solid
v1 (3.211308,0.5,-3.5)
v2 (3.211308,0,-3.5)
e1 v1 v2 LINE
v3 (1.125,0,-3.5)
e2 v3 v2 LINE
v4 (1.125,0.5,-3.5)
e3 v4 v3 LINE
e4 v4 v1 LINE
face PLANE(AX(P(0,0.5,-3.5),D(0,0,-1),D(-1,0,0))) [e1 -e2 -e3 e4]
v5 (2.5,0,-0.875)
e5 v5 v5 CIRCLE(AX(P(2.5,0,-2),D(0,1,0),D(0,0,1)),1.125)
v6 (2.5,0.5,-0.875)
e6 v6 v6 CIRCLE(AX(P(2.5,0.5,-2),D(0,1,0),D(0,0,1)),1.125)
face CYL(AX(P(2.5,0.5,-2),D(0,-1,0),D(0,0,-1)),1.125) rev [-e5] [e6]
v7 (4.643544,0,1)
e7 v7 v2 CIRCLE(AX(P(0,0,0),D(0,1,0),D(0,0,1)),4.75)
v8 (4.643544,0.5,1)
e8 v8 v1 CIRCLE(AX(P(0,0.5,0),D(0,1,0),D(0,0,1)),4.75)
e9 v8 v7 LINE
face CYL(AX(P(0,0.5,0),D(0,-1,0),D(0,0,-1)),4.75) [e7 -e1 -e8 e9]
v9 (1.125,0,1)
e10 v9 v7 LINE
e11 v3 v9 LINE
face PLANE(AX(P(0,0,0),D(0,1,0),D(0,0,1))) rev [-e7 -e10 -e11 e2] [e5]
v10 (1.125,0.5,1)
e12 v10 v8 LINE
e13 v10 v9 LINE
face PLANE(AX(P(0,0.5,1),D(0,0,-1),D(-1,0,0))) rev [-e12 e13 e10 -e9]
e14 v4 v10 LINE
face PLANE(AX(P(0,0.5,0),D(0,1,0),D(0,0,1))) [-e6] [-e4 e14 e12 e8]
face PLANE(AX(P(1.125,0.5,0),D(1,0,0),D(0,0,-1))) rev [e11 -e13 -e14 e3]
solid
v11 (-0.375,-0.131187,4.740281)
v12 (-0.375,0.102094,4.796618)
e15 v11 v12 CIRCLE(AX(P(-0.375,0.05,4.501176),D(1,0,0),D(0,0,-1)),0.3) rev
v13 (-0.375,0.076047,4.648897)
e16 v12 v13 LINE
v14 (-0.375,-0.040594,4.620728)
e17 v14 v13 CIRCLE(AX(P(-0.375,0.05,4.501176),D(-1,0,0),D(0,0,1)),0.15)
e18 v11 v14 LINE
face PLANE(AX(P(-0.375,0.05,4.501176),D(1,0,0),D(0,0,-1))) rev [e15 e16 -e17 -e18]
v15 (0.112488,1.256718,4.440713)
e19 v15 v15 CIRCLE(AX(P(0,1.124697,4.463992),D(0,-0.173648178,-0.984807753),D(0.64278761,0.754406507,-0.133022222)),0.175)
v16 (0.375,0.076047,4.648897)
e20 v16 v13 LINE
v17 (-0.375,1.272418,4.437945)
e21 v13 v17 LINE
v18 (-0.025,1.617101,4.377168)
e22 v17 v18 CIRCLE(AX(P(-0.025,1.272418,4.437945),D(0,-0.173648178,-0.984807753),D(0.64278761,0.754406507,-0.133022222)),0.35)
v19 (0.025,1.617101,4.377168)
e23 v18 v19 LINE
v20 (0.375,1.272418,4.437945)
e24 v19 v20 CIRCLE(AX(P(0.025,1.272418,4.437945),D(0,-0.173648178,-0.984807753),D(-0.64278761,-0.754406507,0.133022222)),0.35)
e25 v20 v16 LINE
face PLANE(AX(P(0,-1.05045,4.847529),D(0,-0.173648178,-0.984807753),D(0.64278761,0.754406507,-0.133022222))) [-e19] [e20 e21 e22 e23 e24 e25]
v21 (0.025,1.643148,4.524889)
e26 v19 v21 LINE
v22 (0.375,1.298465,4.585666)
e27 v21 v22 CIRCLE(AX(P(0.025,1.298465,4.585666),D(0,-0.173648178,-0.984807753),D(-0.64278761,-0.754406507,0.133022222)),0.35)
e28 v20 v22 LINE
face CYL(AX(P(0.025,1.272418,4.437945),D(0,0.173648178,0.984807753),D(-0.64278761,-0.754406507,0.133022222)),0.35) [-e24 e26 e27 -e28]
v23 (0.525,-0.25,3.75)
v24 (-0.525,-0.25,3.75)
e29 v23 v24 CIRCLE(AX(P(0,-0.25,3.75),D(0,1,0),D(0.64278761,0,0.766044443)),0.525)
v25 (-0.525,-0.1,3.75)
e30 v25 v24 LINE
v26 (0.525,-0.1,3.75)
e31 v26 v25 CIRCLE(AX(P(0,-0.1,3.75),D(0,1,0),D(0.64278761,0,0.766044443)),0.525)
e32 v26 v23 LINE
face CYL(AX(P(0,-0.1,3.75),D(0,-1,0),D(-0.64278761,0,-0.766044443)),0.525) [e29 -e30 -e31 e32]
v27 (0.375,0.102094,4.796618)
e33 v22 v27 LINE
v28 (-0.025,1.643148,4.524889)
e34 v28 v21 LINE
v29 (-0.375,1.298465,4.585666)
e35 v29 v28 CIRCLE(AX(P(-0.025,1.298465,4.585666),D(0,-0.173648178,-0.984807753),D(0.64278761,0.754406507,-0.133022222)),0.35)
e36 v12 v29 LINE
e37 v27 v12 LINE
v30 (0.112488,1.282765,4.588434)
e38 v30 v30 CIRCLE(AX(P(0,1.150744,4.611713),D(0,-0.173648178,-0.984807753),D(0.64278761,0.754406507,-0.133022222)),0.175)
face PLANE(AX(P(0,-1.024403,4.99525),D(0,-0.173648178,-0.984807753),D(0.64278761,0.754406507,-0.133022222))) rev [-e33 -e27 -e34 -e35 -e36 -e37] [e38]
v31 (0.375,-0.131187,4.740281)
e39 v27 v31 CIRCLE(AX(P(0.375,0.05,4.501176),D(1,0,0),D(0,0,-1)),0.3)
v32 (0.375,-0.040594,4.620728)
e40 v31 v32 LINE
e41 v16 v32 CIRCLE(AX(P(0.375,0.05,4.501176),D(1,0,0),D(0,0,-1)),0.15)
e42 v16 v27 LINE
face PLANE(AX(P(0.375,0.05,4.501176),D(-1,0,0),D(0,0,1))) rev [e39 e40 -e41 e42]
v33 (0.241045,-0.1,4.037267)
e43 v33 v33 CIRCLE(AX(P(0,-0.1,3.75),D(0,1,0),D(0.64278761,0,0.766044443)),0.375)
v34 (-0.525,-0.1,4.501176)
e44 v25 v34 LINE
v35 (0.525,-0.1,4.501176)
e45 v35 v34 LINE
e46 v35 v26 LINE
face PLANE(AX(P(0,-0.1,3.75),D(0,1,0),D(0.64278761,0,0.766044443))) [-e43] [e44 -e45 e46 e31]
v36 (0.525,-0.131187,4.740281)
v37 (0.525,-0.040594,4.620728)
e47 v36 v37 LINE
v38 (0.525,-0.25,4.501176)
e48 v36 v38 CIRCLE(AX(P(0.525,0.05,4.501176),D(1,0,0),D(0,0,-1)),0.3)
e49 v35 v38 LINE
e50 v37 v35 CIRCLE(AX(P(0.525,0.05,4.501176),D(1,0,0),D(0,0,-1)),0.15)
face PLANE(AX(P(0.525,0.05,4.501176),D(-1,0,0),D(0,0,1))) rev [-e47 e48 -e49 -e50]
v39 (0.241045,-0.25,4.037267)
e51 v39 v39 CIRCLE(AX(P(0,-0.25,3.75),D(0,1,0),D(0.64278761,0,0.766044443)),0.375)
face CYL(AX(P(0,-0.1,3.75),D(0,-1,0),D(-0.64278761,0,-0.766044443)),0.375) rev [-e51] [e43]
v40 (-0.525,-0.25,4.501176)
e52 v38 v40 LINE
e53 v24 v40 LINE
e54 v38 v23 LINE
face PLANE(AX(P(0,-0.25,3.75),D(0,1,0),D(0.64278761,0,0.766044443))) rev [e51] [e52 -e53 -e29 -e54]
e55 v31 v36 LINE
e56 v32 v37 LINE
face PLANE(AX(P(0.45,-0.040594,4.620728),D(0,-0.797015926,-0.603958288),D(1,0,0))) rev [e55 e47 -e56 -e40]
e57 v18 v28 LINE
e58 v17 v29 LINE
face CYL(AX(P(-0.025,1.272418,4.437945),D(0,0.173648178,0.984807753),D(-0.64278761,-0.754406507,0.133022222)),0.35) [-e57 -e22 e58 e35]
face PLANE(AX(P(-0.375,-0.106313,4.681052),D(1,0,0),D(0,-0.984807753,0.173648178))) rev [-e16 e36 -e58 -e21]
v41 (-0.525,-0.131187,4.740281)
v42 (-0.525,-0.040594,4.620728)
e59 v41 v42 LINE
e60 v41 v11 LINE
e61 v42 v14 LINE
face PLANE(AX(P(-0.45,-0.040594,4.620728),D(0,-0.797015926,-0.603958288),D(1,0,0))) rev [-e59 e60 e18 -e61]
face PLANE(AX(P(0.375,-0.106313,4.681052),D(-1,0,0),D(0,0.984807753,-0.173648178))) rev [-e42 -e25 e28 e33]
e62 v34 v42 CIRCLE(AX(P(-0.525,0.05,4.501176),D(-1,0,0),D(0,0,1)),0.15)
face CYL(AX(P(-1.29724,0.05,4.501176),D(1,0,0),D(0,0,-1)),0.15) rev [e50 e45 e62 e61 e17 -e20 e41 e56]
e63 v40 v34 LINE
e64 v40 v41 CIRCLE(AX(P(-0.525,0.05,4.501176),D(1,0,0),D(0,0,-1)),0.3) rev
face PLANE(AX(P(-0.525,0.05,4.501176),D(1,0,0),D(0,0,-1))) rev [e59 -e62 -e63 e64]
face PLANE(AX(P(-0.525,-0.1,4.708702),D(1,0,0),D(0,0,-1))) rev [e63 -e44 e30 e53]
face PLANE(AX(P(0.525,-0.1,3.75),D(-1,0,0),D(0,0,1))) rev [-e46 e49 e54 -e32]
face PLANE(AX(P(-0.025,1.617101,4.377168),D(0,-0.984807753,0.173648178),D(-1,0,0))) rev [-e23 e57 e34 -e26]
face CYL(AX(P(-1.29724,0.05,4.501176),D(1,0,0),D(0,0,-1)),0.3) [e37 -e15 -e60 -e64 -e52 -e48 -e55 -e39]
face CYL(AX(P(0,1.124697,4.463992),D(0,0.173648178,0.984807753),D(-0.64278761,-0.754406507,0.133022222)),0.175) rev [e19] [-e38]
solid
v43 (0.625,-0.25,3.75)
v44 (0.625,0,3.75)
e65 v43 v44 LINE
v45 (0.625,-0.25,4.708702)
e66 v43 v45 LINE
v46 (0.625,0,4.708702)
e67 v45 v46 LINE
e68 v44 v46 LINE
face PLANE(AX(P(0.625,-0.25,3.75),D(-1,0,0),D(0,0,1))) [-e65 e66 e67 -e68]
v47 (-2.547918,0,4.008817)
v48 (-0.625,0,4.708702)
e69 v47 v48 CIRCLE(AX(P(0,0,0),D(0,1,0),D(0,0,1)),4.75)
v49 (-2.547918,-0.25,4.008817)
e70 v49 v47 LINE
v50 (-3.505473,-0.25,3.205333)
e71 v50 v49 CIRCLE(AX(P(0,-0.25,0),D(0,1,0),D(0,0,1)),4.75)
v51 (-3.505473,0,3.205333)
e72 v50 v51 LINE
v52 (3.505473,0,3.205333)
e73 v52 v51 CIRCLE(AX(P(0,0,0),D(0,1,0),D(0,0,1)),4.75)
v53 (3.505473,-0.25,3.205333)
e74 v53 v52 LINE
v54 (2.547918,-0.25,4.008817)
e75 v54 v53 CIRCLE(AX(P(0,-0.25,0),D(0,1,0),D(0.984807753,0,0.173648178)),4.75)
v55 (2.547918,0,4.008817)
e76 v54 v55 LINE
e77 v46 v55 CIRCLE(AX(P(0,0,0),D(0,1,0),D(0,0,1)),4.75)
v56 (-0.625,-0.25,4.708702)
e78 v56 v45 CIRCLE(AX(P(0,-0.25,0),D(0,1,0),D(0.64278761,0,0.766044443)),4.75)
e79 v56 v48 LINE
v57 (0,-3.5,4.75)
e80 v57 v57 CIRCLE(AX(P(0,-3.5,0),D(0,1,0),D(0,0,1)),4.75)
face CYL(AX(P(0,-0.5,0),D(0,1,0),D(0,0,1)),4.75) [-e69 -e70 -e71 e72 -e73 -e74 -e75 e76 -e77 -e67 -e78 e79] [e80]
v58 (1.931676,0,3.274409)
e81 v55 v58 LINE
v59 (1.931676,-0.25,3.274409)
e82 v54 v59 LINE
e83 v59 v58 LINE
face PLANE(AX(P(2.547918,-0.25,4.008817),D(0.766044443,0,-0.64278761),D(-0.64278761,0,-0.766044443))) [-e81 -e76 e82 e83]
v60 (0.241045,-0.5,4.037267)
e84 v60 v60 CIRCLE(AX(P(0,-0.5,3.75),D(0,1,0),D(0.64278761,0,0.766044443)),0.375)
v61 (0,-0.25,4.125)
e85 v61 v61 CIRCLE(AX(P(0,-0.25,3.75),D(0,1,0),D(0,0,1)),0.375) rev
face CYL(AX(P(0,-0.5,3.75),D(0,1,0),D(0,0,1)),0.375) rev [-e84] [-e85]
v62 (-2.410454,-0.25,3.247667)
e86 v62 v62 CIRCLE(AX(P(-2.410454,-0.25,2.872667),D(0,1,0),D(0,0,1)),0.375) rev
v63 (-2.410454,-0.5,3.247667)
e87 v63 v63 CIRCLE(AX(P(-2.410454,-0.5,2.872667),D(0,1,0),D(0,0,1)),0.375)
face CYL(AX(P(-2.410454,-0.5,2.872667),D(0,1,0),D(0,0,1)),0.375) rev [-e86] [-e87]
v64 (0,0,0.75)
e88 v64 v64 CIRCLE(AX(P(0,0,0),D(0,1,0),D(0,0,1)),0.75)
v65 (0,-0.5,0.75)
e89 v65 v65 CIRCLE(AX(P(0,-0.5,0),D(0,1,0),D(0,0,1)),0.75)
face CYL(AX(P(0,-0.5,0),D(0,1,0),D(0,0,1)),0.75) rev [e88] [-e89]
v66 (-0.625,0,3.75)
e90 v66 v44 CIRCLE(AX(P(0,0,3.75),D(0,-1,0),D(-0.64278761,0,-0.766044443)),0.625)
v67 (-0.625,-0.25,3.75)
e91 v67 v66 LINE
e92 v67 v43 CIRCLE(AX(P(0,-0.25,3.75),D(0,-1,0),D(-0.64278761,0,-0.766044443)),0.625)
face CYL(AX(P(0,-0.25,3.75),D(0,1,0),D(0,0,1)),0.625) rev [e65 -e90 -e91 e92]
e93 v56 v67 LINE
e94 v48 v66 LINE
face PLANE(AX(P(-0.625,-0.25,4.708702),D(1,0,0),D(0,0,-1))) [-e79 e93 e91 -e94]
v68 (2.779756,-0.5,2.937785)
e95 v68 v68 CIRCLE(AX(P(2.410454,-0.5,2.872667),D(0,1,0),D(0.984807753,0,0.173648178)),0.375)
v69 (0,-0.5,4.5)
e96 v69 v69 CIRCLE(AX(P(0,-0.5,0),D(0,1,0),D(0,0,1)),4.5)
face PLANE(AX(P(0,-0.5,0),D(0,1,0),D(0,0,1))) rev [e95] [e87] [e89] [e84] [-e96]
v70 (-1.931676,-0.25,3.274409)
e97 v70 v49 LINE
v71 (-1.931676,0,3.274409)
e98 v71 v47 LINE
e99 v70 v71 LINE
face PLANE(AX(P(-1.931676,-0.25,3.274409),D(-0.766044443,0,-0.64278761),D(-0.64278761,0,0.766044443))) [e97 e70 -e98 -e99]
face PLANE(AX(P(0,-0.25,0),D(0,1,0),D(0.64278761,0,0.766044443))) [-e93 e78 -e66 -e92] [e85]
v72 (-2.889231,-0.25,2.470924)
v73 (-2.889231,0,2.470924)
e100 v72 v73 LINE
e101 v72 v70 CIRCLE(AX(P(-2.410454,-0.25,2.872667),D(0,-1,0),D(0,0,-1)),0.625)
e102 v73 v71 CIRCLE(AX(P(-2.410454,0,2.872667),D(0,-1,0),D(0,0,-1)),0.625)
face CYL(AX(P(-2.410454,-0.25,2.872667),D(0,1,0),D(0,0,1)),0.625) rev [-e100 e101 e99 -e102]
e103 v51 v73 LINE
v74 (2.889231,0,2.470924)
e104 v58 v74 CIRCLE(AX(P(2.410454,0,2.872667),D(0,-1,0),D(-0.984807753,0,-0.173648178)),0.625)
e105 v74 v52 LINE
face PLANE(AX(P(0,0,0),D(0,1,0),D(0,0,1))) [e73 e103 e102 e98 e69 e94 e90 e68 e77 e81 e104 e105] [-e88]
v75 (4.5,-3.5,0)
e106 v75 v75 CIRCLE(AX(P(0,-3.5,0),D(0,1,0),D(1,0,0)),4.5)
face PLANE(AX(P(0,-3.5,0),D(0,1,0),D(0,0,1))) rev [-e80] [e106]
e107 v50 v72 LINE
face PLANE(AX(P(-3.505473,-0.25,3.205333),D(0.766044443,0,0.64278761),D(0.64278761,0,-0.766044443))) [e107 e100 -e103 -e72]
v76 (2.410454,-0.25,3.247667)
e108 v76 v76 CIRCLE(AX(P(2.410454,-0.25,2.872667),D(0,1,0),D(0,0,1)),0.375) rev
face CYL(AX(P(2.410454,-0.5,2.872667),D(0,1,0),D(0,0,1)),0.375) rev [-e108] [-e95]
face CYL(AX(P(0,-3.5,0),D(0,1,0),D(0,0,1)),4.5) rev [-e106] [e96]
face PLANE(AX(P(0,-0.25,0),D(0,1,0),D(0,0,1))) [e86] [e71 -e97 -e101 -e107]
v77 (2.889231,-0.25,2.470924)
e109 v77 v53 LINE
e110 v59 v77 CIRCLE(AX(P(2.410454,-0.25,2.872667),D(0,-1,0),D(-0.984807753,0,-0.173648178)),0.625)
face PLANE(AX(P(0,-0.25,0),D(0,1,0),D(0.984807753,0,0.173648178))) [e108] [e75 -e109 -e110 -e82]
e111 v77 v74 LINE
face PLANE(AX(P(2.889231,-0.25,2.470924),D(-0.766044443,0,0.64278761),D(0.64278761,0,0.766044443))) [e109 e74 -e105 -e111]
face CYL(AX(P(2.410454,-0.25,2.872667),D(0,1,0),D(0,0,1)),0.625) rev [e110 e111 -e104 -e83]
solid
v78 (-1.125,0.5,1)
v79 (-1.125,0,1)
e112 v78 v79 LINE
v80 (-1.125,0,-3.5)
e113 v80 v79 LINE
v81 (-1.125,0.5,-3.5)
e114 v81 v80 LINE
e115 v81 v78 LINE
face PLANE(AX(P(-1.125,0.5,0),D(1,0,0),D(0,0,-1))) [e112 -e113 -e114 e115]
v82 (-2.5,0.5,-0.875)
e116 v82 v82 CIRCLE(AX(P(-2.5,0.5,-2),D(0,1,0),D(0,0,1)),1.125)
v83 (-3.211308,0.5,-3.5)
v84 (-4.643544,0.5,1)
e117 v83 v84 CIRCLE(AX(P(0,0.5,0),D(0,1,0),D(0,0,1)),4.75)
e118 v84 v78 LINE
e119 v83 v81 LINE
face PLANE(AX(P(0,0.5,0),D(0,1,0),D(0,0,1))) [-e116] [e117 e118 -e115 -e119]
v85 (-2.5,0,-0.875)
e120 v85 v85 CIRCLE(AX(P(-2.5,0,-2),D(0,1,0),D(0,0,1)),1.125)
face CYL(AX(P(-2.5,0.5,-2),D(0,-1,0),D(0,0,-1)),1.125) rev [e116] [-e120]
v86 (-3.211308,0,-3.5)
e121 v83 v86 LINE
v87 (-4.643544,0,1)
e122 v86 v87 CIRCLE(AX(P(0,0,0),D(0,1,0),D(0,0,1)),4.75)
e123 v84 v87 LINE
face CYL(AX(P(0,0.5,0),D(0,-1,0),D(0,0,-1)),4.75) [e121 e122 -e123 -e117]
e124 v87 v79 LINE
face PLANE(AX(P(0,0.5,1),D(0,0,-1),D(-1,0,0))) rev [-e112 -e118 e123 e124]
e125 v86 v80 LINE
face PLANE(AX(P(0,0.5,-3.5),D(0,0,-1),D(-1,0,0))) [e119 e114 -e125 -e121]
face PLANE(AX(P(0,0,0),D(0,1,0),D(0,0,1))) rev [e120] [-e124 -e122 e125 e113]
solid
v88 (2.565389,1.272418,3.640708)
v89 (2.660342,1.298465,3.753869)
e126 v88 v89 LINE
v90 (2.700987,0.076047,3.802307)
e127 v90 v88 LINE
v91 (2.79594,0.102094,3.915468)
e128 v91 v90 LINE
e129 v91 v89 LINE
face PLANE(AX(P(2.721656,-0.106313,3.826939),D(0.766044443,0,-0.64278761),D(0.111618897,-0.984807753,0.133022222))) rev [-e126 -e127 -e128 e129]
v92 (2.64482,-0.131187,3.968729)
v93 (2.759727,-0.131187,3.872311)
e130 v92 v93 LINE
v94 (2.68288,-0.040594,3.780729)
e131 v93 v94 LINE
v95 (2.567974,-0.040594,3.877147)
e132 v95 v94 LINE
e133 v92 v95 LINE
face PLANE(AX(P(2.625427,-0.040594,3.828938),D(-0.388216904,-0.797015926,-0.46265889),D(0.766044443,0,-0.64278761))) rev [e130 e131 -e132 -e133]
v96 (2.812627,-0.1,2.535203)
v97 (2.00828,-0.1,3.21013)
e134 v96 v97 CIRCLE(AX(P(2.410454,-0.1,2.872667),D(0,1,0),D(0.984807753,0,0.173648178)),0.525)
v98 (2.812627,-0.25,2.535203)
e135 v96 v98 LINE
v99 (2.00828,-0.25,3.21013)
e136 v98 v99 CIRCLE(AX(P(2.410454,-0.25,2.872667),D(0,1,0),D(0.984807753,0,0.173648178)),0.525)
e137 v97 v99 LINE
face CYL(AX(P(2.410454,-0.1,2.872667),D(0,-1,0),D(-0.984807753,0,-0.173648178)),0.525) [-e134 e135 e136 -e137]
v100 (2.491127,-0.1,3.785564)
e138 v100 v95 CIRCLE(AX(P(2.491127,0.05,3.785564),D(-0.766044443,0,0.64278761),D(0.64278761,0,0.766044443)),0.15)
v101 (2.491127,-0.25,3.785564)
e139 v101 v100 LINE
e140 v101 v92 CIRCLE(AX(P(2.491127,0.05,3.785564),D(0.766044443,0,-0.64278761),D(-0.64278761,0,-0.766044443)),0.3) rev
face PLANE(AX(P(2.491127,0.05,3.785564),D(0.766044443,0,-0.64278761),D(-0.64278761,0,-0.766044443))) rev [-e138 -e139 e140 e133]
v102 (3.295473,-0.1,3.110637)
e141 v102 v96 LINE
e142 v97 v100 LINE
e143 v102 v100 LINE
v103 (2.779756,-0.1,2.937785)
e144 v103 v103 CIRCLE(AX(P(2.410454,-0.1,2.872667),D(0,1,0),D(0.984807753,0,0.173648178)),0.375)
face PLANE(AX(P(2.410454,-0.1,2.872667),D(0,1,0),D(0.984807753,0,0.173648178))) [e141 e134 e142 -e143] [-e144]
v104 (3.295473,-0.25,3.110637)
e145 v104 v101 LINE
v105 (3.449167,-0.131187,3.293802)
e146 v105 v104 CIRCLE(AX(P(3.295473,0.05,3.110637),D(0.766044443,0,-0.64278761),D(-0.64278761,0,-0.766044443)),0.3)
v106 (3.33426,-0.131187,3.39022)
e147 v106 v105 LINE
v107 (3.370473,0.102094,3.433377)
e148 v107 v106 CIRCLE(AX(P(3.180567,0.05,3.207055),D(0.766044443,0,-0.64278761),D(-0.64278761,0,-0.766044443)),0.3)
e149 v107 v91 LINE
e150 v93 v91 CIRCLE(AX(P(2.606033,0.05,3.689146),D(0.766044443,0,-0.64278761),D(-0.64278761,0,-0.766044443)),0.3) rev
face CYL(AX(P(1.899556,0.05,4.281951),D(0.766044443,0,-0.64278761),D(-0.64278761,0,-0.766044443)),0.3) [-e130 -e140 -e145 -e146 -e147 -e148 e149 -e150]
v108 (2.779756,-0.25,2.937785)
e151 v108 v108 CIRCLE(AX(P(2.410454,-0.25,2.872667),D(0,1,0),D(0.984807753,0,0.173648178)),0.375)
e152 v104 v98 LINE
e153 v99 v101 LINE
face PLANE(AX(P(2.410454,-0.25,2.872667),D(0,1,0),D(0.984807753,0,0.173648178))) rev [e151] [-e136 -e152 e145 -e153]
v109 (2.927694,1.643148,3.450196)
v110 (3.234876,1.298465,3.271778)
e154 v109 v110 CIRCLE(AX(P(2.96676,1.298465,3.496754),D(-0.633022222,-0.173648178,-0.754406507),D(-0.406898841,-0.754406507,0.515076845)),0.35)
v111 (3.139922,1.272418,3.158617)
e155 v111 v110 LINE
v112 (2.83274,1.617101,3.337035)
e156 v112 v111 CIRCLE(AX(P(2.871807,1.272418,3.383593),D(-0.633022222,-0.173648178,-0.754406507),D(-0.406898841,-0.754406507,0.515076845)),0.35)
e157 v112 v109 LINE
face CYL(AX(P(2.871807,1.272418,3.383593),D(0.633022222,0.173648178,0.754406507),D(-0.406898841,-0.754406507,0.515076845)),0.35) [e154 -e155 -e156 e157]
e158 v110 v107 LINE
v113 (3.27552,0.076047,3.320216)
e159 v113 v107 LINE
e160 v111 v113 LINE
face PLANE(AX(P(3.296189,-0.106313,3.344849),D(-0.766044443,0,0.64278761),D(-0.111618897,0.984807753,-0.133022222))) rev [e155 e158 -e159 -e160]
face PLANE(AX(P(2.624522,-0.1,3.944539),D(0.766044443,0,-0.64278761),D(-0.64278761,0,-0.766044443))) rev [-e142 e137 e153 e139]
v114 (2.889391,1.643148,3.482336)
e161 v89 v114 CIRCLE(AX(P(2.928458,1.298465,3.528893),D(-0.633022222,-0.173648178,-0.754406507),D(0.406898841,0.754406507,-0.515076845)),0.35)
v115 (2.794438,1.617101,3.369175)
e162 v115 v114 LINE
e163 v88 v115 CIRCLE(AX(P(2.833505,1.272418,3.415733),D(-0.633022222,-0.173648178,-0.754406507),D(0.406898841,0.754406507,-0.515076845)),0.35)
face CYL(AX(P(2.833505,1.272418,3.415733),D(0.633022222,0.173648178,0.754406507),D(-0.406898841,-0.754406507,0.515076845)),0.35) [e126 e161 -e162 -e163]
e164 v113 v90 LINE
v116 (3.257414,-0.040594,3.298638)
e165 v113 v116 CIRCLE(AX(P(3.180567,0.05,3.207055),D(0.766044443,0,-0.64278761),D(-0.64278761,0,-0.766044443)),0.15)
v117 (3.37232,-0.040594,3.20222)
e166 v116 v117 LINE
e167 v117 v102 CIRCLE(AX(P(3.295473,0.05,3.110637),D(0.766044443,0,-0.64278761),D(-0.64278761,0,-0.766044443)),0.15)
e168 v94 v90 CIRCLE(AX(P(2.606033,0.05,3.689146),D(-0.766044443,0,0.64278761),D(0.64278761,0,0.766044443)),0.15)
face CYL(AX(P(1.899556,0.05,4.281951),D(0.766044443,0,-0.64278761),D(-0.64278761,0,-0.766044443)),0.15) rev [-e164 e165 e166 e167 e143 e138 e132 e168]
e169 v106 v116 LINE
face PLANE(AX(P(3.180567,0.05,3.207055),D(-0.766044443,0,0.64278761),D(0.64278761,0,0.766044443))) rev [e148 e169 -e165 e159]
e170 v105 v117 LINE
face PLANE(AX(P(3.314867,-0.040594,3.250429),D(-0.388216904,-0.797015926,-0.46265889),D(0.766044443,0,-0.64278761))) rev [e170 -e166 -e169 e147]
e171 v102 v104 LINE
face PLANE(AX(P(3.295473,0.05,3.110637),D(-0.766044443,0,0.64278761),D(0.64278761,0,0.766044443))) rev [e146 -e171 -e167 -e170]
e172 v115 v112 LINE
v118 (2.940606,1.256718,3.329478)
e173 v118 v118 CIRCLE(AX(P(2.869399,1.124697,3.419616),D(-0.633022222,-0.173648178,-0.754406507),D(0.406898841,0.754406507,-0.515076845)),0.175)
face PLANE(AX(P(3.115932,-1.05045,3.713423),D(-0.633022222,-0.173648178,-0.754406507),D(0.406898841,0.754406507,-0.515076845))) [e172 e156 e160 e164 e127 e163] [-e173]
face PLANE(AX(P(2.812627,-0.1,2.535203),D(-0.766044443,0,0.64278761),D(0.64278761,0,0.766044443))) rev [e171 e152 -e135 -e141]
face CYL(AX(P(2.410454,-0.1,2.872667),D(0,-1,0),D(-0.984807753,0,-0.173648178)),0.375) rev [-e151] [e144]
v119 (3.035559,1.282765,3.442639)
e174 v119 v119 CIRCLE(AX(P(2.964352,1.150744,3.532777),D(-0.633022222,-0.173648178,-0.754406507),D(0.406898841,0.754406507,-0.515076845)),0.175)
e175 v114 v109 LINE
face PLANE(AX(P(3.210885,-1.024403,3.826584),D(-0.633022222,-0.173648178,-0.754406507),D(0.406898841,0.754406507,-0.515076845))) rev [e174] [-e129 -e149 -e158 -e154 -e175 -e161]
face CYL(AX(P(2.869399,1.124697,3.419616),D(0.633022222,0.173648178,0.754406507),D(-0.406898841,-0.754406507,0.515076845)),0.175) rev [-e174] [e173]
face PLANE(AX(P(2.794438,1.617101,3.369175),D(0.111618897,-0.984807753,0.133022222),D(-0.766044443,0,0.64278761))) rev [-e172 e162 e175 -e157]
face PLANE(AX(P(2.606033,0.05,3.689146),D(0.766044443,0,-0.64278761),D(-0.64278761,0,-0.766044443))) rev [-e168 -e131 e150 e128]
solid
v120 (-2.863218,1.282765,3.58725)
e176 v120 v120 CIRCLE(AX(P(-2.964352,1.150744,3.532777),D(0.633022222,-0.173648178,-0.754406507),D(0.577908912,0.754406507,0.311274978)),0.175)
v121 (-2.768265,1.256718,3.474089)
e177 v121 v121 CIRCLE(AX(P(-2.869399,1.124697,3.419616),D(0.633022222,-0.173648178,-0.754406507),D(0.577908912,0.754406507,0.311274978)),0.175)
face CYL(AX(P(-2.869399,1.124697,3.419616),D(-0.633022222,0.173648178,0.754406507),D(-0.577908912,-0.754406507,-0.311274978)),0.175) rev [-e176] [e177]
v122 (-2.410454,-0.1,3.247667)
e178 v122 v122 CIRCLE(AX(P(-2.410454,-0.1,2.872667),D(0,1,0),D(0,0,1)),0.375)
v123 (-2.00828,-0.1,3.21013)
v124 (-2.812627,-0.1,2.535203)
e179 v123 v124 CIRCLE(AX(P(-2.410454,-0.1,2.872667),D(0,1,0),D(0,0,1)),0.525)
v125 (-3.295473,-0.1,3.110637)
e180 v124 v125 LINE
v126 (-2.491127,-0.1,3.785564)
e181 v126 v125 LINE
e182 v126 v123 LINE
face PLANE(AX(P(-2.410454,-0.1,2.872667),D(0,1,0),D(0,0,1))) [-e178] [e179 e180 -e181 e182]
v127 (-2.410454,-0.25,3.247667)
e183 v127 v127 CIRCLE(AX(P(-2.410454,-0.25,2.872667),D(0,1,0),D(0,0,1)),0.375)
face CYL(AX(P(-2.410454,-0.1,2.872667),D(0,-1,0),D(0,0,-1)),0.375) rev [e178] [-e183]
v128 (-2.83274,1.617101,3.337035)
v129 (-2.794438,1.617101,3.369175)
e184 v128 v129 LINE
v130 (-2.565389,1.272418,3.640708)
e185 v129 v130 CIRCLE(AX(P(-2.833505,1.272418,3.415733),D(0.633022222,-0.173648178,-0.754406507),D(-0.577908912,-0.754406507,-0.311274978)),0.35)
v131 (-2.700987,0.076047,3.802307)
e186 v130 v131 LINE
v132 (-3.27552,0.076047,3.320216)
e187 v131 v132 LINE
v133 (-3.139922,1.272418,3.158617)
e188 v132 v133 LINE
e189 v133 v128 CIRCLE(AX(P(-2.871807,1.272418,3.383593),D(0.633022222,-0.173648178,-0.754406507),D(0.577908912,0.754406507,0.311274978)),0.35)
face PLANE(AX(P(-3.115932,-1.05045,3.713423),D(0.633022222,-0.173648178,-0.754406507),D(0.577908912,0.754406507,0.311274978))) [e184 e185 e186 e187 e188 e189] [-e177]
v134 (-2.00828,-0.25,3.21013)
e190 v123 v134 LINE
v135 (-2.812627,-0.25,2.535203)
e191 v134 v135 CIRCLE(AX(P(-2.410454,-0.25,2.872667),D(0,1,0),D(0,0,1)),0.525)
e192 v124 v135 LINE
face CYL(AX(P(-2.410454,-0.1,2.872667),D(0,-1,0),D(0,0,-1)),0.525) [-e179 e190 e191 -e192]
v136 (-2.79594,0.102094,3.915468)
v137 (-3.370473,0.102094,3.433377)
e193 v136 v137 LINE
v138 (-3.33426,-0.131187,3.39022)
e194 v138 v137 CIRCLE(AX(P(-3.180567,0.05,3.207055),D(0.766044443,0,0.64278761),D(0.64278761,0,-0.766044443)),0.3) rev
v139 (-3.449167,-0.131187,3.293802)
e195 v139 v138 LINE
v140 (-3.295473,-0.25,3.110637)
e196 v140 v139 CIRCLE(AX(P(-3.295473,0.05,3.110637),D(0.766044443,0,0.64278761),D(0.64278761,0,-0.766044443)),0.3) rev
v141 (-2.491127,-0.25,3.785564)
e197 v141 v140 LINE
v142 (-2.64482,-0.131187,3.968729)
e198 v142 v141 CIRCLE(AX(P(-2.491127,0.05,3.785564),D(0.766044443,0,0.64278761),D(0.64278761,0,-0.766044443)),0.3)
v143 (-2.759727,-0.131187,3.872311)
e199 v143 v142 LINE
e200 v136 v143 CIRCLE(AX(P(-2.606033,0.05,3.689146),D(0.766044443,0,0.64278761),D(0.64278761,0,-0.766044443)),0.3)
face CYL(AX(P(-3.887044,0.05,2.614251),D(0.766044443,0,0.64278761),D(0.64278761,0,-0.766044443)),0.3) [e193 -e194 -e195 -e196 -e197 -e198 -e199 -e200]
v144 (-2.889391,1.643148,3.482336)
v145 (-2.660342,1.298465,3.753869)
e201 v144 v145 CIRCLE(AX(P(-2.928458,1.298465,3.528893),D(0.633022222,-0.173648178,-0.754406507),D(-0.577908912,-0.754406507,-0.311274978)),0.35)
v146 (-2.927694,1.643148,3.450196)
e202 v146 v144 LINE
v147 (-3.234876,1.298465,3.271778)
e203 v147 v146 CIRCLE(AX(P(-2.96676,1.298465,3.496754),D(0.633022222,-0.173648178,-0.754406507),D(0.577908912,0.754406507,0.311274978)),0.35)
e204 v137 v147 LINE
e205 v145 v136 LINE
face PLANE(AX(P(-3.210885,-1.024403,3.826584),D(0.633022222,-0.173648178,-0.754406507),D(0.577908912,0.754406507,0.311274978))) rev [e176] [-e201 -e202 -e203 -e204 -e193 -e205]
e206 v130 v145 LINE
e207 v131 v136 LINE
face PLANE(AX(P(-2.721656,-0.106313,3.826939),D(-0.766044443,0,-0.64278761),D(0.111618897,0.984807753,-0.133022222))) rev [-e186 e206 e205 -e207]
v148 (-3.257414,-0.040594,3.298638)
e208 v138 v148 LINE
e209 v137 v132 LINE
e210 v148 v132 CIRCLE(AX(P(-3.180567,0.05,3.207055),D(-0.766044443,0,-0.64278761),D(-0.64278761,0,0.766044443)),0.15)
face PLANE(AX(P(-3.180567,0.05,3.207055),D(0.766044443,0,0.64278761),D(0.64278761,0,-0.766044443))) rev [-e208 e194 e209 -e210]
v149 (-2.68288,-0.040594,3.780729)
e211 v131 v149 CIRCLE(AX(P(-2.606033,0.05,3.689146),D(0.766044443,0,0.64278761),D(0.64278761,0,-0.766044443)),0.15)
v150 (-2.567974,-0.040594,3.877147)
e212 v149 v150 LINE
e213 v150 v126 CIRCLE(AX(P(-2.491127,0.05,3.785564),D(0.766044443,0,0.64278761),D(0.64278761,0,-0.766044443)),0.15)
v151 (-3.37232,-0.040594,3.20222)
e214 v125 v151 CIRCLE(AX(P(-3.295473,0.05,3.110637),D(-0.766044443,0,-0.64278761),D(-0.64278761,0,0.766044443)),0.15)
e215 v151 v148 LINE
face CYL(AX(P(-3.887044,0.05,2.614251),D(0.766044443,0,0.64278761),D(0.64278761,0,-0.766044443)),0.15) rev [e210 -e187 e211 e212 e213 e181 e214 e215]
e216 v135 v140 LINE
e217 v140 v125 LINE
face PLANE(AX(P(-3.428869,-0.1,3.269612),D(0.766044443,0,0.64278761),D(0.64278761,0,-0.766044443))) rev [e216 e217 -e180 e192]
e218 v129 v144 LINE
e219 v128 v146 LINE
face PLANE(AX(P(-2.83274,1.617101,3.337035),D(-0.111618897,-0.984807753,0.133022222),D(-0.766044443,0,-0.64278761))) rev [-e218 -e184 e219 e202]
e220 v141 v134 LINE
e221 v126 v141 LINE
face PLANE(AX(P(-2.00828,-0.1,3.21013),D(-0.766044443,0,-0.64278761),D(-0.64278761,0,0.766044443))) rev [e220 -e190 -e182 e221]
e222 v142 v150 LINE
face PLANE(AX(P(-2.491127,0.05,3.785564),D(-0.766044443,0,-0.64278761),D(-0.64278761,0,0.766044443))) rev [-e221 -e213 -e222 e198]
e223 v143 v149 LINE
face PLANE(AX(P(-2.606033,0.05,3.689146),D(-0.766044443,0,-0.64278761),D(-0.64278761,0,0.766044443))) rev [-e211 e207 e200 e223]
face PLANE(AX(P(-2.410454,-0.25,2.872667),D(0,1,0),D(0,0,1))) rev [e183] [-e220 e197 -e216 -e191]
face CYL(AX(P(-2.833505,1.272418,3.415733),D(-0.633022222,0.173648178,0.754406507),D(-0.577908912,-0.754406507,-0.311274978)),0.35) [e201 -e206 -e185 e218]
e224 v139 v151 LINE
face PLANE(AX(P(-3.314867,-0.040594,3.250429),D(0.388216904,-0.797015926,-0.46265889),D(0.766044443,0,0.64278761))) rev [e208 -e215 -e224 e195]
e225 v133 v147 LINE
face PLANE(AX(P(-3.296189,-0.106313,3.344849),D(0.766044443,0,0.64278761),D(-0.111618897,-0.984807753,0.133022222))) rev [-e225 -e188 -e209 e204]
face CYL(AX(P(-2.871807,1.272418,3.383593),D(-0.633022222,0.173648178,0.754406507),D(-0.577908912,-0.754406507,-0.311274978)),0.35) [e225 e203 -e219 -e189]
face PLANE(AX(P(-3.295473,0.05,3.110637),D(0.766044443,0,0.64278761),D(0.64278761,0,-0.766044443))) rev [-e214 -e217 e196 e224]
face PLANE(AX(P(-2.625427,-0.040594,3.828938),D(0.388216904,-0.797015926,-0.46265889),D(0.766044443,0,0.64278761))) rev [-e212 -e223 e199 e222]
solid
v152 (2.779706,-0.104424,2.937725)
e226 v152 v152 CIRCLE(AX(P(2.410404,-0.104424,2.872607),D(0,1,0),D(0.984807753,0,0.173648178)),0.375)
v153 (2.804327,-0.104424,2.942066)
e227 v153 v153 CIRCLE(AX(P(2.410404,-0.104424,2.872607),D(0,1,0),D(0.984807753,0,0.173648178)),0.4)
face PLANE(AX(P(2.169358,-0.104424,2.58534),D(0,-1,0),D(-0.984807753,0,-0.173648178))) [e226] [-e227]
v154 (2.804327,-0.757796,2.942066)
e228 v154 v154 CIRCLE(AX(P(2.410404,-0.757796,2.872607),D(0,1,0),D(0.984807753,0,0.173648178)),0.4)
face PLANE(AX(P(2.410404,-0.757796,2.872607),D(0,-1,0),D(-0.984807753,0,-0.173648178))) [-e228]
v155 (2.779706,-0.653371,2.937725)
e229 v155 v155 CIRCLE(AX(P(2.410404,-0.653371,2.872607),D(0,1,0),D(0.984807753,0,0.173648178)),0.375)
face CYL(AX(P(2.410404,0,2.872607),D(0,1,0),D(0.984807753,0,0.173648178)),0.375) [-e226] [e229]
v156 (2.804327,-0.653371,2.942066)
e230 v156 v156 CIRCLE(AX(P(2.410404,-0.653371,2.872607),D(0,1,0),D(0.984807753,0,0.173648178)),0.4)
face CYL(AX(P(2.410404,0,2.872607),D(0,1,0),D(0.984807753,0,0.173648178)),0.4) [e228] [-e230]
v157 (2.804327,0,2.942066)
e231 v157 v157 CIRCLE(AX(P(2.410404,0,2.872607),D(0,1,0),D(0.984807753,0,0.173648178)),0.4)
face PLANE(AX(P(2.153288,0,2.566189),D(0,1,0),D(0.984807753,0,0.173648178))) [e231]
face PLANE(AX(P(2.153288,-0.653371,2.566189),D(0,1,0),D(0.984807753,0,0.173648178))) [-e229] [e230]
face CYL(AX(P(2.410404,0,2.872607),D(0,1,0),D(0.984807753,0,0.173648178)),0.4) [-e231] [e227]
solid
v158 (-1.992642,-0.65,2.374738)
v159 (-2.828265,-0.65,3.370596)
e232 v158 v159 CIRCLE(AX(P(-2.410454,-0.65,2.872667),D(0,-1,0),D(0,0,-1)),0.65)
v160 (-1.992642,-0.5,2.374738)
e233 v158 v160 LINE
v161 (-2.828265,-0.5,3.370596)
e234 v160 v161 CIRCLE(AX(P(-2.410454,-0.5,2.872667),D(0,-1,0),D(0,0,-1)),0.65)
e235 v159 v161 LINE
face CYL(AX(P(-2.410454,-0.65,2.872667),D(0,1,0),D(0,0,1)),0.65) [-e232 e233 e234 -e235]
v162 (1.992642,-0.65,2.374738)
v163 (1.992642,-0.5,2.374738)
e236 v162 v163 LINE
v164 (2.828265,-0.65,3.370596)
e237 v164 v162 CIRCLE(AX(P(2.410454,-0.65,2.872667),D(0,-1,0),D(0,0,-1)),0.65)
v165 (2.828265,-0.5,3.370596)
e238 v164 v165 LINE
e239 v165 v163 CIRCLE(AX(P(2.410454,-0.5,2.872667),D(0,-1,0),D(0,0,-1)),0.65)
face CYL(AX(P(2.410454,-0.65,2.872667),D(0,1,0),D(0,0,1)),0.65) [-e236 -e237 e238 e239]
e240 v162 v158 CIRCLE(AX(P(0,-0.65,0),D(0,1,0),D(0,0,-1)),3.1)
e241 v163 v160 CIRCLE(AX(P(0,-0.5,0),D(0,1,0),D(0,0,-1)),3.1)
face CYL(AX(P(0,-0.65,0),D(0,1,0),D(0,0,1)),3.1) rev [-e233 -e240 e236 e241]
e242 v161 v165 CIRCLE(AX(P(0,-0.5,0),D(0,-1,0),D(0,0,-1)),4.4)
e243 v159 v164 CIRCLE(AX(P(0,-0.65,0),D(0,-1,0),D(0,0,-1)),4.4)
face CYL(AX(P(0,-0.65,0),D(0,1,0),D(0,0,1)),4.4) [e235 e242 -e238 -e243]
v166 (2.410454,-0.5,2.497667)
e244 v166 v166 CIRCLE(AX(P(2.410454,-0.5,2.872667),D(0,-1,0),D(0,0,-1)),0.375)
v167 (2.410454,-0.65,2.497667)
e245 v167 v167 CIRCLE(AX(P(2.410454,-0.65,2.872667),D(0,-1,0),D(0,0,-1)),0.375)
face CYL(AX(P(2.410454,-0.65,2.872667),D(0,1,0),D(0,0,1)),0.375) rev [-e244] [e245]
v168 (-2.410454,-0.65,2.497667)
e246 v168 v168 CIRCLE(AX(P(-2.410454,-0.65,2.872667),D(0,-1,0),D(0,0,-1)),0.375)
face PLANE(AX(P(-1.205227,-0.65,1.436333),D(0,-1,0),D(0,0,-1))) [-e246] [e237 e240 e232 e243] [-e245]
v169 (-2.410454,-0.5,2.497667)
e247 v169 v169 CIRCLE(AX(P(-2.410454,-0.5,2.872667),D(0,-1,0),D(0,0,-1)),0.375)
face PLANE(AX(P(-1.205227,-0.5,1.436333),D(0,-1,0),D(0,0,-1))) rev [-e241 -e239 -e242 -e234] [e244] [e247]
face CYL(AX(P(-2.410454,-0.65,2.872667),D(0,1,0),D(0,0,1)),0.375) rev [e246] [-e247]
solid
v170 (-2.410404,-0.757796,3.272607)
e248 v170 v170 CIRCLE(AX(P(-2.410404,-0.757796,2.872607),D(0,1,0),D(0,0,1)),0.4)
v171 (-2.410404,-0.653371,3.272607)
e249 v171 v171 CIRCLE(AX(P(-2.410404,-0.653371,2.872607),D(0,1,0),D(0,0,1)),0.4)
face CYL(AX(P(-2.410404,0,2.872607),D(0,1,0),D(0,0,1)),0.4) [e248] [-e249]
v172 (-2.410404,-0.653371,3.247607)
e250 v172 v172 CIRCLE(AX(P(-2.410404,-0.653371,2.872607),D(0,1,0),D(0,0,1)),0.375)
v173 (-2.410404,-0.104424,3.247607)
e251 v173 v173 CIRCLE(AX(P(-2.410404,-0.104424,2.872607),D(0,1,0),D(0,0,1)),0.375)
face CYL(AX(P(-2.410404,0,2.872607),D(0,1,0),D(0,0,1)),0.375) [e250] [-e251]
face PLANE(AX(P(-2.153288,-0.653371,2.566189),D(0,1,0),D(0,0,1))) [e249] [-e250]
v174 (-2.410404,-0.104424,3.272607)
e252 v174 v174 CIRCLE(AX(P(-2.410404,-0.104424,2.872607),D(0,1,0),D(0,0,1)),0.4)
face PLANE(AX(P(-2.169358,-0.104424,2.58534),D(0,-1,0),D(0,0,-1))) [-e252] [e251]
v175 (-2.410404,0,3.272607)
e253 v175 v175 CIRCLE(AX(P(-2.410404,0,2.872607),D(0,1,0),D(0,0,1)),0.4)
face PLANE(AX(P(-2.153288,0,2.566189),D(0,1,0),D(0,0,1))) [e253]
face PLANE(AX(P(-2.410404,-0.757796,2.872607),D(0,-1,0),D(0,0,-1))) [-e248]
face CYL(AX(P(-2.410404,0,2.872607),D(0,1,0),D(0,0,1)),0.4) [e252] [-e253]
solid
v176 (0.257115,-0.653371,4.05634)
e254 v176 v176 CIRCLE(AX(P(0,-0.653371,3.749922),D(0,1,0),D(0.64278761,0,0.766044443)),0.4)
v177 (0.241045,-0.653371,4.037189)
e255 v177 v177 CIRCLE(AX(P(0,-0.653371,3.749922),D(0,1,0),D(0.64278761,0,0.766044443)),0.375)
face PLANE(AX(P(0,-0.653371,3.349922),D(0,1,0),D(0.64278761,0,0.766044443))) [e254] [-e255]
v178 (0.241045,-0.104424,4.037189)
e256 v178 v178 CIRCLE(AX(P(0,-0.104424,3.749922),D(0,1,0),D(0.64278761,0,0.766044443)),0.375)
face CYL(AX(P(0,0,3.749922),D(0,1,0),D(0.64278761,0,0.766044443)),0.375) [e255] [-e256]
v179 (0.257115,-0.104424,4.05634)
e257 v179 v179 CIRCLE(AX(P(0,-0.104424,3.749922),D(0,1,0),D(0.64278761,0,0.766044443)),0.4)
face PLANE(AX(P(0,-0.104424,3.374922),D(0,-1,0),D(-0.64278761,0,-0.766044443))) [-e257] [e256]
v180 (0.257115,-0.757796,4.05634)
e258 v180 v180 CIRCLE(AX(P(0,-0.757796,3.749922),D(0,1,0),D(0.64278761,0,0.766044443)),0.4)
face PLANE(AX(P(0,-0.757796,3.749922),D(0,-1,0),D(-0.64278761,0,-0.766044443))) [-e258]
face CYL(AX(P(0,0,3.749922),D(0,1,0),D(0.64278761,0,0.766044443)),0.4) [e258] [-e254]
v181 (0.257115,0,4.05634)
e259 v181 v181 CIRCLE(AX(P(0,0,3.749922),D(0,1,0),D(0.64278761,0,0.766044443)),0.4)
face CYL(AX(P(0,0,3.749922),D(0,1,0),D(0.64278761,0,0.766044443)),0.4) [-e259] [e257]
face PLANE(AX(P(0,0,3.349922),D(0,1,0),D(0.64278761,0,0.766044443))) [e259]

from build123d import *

# Parameters (mm, degrees)
SKETCH1_R                  = 4.75
SKETCH1_R_2                = 0.75
BOSS_EXTRUDE1_DEPTH        = 0.5
SKETCH1_3_R                = 1.125
BOSS_EXTRUDE2_DEPTH        = 0.5
BOSS_EXTRUDE2_2_DEPTH      = 0.5
SKETCH2_R                  = 0.375
CUT_EXTRUDE1_DEPTH         = 7.736096793
CUT_EXTRUDE2_DEPTH         = 0.25
CIRPATTERN1_COUNT          = 3
CIRPATTERN1_ANGLE          = 80
EXTRUDE_THIN2_START        = -0.5
SKETCH1_5_R                = 4.75
SKETCH1_5_R_2              = 4.5
EXTRUDE_THIN2_DEPTH        = 3
BASE_FLANGE1_START         = 0.15
SKETCH4_R                  = 0.175
SKETCH4_R_2                = 0.375
BASE_FLANGE1_DEPTH         = 0.15
SKETCHED_START             = -0.525
SKETCHED_BEND1_DEPTH       = 1.05
SKETCHED_BEND1_2_DEPTH     = 0.15
SKETCHED_START_2           = 0.375
SKETCHED_BEND1_3_DEPTH     = 0.15
SKETCHED_BEND1_4_DEPTH     = 1.05
SKETCHED_START_3           = -0.375
SKETCHED_BEND1_5_DEPTH     = 0.75
SKETCHED_START_4           = -4.741475404
SKETCHED_BEND1_6_OUTLINE_R = 0.175
SKETCHED_BEND1_6_DEPTH     = 0.149999999
SKETCH10_R                 = 0.375
BASE_FLANGE2_DEPTH         = 0.15
CIRPATTERN2_COUNT          = 3
CIRPATTERN2_ANGLE          = 80


with BuildPart() as part:
    # Sketch1 → Boss-Extrude1 (new body)
    with BuildSketch(Plane(origin=(0, 0, 0), x_dir=(1, 0, 0), z_dir=(0, 1, 0))):
        with Locations(Location((0, 0, 0), (0, 0, 270))):
            Circle(SKETCH1_R)
        with Locations(Location((0, 0, 0), (0, 0, 270))):
            Circle(SKETCH1_R_2, mode=Mode.SUBTRACT)
    extrude(amount=-BOSS_EXTRUDE1_DEPTH)

    # Sketch2 → Cut-Extrude1 (cut, through all)
    with BuildSketch(Plane(origin=(0, 0, 0), x_dir=(1, 0, 0), z_dir=(0, 1, 0))):
        with Locations(Location((-2.410453536, -2.872666662, 0), (0, 0, 270))):
            Circle(SKETCH2_R)
    cut_extrude1 = extrude(amount=-CUT_EXTRUDE1_DEPTH, mode=Mode.SUBTRACT)

    # Sketch2<4> → Cut-Extrude2 (cut)
    with BuildSketch(Plane(origin=(0, 0, 0), x_dir=(1, 0, 0), z_dir=(0, 1, 0))):
        with BuildLine():
            Line((-3.505473113, -3.205332784), (-2.889231313, -2.470924406))
            ThreePointArc((-2.889231313, -2.470924406), (-2.00871128, -2.393888885), (-1.931675759, -3.274408918))
            Line((-1.931675759, -3.274408918), (-2.547917559, -4.008817296))
            ThreePointArc((-2.547917559, -4.008817296), (-3.053241146, -3.638711105), (-3.505473113, -3.205332784))
        make_face()
    cut_extrude2 = extrude(amount=-CUT_EXTRUDE2_DEPTH, mode=Mode.SUBTRACT)

    # CirPattern1: Cut-Extrude1, Cut-Extrude2 ×3 about axis
    cirpattern1_axis = Axis((0, 0, 0), (0, 1, 0))
    add([cut_extrude1.rotate(cirpattern1_axis, i * CIRPATTERN1_ANGLE / (CIRPATTERN1_COUNT - 1)) for i in range(1, CIRPATTERN1_COUNT)], mode=Mode.SUBTRACT)
    add([cut_extrude2.rotate(cirpattern1_axis, i * CIRPATTERN1_ANGLE / (CIRPATTERN1_COUNT - 1)) for i in range(1, CIRPATTERN1_COUNT)], mode=Mode.SUBTRACT)

    # Sketch1<5> → Extrude-Thin2 (add)
    with BuildSketch(Plane(origin=(0, 0, 0), x_dir=(1, 0, 0), z_dir=(0, 1, 0)).offset(EXTRUDE_THIN2_START)):
        Circle(SKETCH1_5_R)
        Circle(SKETCH1_5_R_2, mode=Mode.SUBTRACT)
    extrude(amount=-EXTRUDE_THIN2_DEPTH)


with BuildPart() as body_2:
    # Sketch1<3> → Boss-Extrude2 (new body)
    with BuildSketch(Plane(origin=(0, 0, 0), x_dir=(1, 0, 0), z_dir=(0, 1, 0))):
        with BuildLine():
            ThreePointArc((4.75, 0), (4.348345299, 1.911646713), (3.211308145, 3.5))
            Line((3.211308145, 3.5), (1.125, 3.5))
            Line((1.125, 3.5), (1.125, -1))
            Line((1.125, -1), (4.643543905, -1))
            ThreePointArc((4.643543905, -1), (4.723310997, -0.502825243), (4.75, 0))
        make_face()
        with Locations(Location((2.5, 2, 0), (0, 0, 270))):
            Circle(SKETCH1_3_R, mode=Mode.SUBTRACT)
    extrude(amount=BOSS_EXTRUDE2_DEPTH)


with BuildPart() as body_3:
    # Sketch1<3> → Boss-Extrude2 2 (new body)
    with BuildSketch(Plane(origin=(0, 0, 0), x_dir=(1, 0, 0), z_dir=(0, 1, 0))):
        with BuildLine():
            Line((-1.125, 3.5), (-3.211308145, 3.5))
            ThreePointArc((-3.211308145, 3.5), (-4.526276083, 1.440598771), (-4.643543905, -1))
            Line((-4.643543905, -1), (-1.125, -1))
            Line((-1.125, -1), (-1.125, 3.5))
        make_face()
        with Locations(Location((-2.5, 2, 0), (0, 0, 270))):
            Circle(SKETCH1_3_R, mode=Mode.SUBTRACT)
    extrude(amount=BOSS_EXTRUDE2_2_DEPTH)


with BuildPart() as body_4:
    # Base-Flange1: sheet metal written as solids
    # Sketch4 → Base-Flange1 (new body)
    with BuildSketch(Plane(origin=(0, -0.25, 0), x_dir=(1, 0, 0), z_dir=(0, 1, 0)).offset(BASE_FLANGE1_START)):
        with BuildLine():
            Line((-3.428868668, -3.269611545), (-2.812626869, -2.535203167))
            ThreePointArc((-2.812626869, -2.535203167), (-2.072990041, -2.470493329), (-2.008280204, -3.210130157))
            Line((-2.008280204, -3.210130157), (-2.624522003, -3.944538535))
            Line((-2.624522003, -3.944538535), (-2.73942867, -3.848120394))
            Line((-2.73942867, -3.848120394), (-3.639331323, -4.920582614))
            ThreePointArc((-3.639331323, -4.920582614), (-3.876942368, -5.044275095), (-4.132422542, -4.963722506))
            Line((-4.132422542, -4.963722506), (-4.170724764, -4.931583125))
            ThreePointArc((-4.170724764, -4.931583125), (-4.294417245, -4.69397208), (-4.213864655, -4.438491907))
            Line((-4.213864655, -4.438491907), (-3.313962002, -3.366029686))
            Line((-3.313962002, -3.366029686), (-3.428868668, -3.269611545))
        make_face()
        with Locations(Location((-3.830179848, -4.564630594, 0), (0, 0, 270))):
            Circle(SKETCH4_R, mode=Mode.SUBTRACT)
        with Locations(Location((-2.410453536, -2.872666662, 0), (0, 0, 270))):
            Circle(SKETCH4_R_2, mode=Mode.SUBTRACT)
    extrude(amount=-BASE_FLANGE1_DEPTH)

    # Sketched Bend1: read off the stored shape, not the designer's step
    # Sketched Bend1 outline → Sketched Bend1 (cut)
    with BuildSketch(Plane(origin=(0, 0, 0), x_dir=(0.6427876096865547, 0, -0.7660444431189651), z_dir=(0.766044443118965, 0, 0.642787609686555)).offset(SKETCHED_START)):
        with BuildLine():
            Line((-4.760983594, -0.1), (-6.45870205, -0.1))
            Line((-6.45870205, -0.1), (-6.45870205, -0.25))
            Line((-6.45870205, -0.25), (-4.501175973, -0.25))
            ThreePointArc((-4.501175973, -0.25), (-4.651175973, -0.209807621), (-4.760983594, -0.1))
        make_face()
    extrude(amount=SKETCHED_BEND1_DEPTH, mode=Mode.SUBTRACT)

    # Sketched Bend1 2 outline → Sketched Bend1 2 (cut)
    with BuildSketch(Plane(origin=(0, 0, 0), x_dir=(0.6427876096865547, 0, -0.7660444431189651), z_dir=(0.766044443118965, 0, 0.642787609686555)).offset(SKETCHED_START)):
        Polygon((-4.70870205, -0.107257954), (-4.699124063, -0.1), (-4.70870205, -0.1), align=None)
    extrude(amount=SKETCHED_BEND1_2_DEPTH, mode=Mode.SUBTRACT)

    # Sketched Bend1 3 outline → Sketched Bend1 3 (cut)
    with BuildSketch(Plane(origin=(0, 0, 0), x_dir=(0.6427876096865547, 0, -0.7660444431189651), z_dir=(0.766044443118965, 0, 0.642787609686555)).offset(SKETCHED_START_2)):
        Polygon((-4.70870205, -0.107257954), (-4.699124063, -0.1), (-4.70870205, -0.1), align=None)
    extrude(amount=SKETCHED_BEND1_3_DEPTH, mode=Mode.SUBTRACT)

    # Sketched Bend1 4 outline → Sketched Bend1 4 (add)
    with BuildSketch(Plane(origin=(0, 0, 0), x_dir=(0.6427876096865547, 0, -0.7660444431189651), z_dir=(0.766044443118965, 0, 0.642787609686555)).offset(SKETCHED_START)):
        with BuildLine():
            ThreePointArc((-4.501175973, -0.1), (-4.567925274, -0.084329932), (-4.620728362, -0.040593743))
            Line((-4.620728362, -0.040593743), (-4.699124063, -0.1))
            Line((-4.699124063, -0.1), (-4.501175973, -0.1))
        make_face()
        with BuildLine():
            Line((-4.70870205, -0.166640087), (-4.70870205, -0.107257954))
            Line((-4.70870205, -0.107257954), (-4.740280751, -0.131187486))
            ThreePointArc((-4.740280751, -0.131187486), (-4.725193834, -0.149539465), (-4.70870205, -0.166640087))
        make_face()
    extrude(amount=SKETCHED_BEND1_4_DEPTH)

    # Sketched Bend1 5 outline → Sketched Bend1 5 (add)
    with BuildSketch(Plane(origin=(0, 0, 0), x_dir=(0.6427876096865547, 0, -0.7660444431189651), z_dir=(0.766044443118965, 0, 0.642787609686555)).offset(SKETCHED_START_3)):
        with BuildLine():
            ThreePointArc((-4.620728362, -0.040593743), (-4.646984295, 0.014787316), (-4.648897136, 0.076047227))
            Line((-4.648897136, 0.076047227), (-4.377167779, 1.617100985))
            Line((-4.377167779, 1.617100985), (-4.524888942, 1.643148211))
            Line((-4.524888942, 1.643148211), (-4.796618299, 0.102094453))
            ThreePointArc((-4.796618299, 0.102094453), (-4.796618299, -0.002094454), (-4.760983594, -0.1))
            Line((-4.760983594, -0.1), (-4.699124063, -0.1))
            Line((-4.699124063, -0.1), (-4.620728362, -0.040593743))
        make_face()
    extrude(amount=SKETCHED_BEND1_5_DEPTH)

    # Sketched Bend1 6 outline → Sketched Bend1 6 (cut)
    with BuildSketch(Plane(origin=(0, 0, 0), x_dir=(0.7741336234861974, 0.1419950663058133, 0.6168910228986462), z_dir=(0.6330222215595044, -0.17364817766693408, -0.7544065067354754)).offset(SKETCHED_START_4)):
        with BuildLine():
            Line((-0.251054745, -0.877817458), (0.095287988, -0.827352508))
            ThreePointArc((0.095287988, -0.827352508), (-0.164394149, -0.761595178), (-0.301519694, -0.531474724))
            Line((-0.301519694, -0.531474724), (-0.251054745, -0.877817458))
        make_face()
        with BuildLine():
            ThreePointArc((0.440643306, -0.423335547), (0.374885975, -0.683017684), (0.144765522, -0.82014323))
            Line((0.144765522, -0.82014323), (0.491108255, -0.769678281))
            Line((0.491108255, -0.769678281), (0.440643306, -0.423335547))
        make_face()
        with Locations((0.04793397, -0.328972536)):
            Circle(SKETCHED_BEND1_6_OUTLINE_R)
    extrude(amount=SKETCHED_BEND1_6_DEPTH, mode=Mode.SUBTRACT)


with BuildPart() as body_5:
    # Base-Flange2: sheet metal written as solids
    # Sketch10 → Base-Flange2 (new body)
    with BuildSketch(Plane.XZ.offset(0.5)):
        with BuildLine():
            ThreePointArc((-2.828265483, 3.37059555), (0, -4.4), (2.828265483, 3.37059555))
            ThreePointArc((2.828265483, 3.37059555), (1.912524648, 3.290478608), (1.99264159, 2.374737774))
            ThreePointArc((1.99264159, 2.374737774), (0, -3.1), (-1.99264159, 2.374737774))
            ThreePointArc((-1.99264159, 2.374737774), (-1.912524648, 3.290478608), (-2.828265483, 3.37059555))
        make_face()
        with Locations(Location((2.410453536, 2.872666662, 0), (0, 0, 270))):
            Circle(SKETCH10_R, mode=Mode.SUBTRACT)
        with Locations(Location((-2.410453536, 2.872666662, 0), (0, 0, 270))):
            Circle(SKETCH10_R, mode=Mode.SUBTRACT)
    extrude(amount=BASE_FLANGE2_DEPTH)


with BuildPart() as body_6:
    # Sketch13 → Revolve1 (revolve)
    with BuildSketch(Plane(origin=(0, 0, 0), x_dir=(-0.6427876096865403, 0, 0.7660444431189773), z_dir=(-0.7660444431189773, 0, -0.6427876096865403)), mode=Mode.PRIVATE) as revolve1_sk:
        Polygon((3.374922202, -0.104424067), (3.349922202, -0.104424067), (3.349922202, 0), (3.749922202, 0), (3.749922202, -0.75779552), (3.349922202, -0.75779552), (3.349922202, -0.653371453), (3.374922202, -0.653371453), align=None)
    revolve(revolve1_sk.sketch.rotate(Axis((-2.410403529, 0, 2.872607065), (0, -1, 0)), 140), axis=Axis((-2.410403529, 0, 2.872607065), (0, -1, 0)))


with BuildPart() as cirpattern2_1:
    # CirPattern2: pattern copy
    add(body_6.part.rotate(Axis((0, 0, 0), (0, 1, 0)), 1 * CIRPATTERN2_ANGLE / (CIRPATTERN2_COUNT - 1)))


with BuildPart() as cirpattern2_2:
    # CirPattern2: pattern copy
    add(body_6.part.rotate(Axis((0, 0, 0), (0, 1, 0)), 2 * CIRPATTERN2_ANGLE / (CIRPATTERN2_COUNT - 1)))


with BuildPart() as cirpattern2_3:
    # CirPattern2: pattern copy
    add(body_4.part.rotate(Axis((0, 0, 0), (0, 1, 0)), 1 * CIRPATTERN2_ANGLE / (CIRPATTERN2_COUNT - 1)))


with BuildPart() as cirpattern2_4:
    # CirPattern2: pattern copy
    add(body_4.part.rotate(Axis((0, 0, 0), (0, 1, 0)), 2 * CIRPATTERN2_ANGLE / (CIRPATTERN2_COUNT - 1)))


solid = Compound([part.part, body_2.part, body_3.part, body_4.part, body_5.part, body_6.part, cirpattern2_1.part, cirpattern2_2.part, cirpattern2_3.part, cirpattern2_4.part])
